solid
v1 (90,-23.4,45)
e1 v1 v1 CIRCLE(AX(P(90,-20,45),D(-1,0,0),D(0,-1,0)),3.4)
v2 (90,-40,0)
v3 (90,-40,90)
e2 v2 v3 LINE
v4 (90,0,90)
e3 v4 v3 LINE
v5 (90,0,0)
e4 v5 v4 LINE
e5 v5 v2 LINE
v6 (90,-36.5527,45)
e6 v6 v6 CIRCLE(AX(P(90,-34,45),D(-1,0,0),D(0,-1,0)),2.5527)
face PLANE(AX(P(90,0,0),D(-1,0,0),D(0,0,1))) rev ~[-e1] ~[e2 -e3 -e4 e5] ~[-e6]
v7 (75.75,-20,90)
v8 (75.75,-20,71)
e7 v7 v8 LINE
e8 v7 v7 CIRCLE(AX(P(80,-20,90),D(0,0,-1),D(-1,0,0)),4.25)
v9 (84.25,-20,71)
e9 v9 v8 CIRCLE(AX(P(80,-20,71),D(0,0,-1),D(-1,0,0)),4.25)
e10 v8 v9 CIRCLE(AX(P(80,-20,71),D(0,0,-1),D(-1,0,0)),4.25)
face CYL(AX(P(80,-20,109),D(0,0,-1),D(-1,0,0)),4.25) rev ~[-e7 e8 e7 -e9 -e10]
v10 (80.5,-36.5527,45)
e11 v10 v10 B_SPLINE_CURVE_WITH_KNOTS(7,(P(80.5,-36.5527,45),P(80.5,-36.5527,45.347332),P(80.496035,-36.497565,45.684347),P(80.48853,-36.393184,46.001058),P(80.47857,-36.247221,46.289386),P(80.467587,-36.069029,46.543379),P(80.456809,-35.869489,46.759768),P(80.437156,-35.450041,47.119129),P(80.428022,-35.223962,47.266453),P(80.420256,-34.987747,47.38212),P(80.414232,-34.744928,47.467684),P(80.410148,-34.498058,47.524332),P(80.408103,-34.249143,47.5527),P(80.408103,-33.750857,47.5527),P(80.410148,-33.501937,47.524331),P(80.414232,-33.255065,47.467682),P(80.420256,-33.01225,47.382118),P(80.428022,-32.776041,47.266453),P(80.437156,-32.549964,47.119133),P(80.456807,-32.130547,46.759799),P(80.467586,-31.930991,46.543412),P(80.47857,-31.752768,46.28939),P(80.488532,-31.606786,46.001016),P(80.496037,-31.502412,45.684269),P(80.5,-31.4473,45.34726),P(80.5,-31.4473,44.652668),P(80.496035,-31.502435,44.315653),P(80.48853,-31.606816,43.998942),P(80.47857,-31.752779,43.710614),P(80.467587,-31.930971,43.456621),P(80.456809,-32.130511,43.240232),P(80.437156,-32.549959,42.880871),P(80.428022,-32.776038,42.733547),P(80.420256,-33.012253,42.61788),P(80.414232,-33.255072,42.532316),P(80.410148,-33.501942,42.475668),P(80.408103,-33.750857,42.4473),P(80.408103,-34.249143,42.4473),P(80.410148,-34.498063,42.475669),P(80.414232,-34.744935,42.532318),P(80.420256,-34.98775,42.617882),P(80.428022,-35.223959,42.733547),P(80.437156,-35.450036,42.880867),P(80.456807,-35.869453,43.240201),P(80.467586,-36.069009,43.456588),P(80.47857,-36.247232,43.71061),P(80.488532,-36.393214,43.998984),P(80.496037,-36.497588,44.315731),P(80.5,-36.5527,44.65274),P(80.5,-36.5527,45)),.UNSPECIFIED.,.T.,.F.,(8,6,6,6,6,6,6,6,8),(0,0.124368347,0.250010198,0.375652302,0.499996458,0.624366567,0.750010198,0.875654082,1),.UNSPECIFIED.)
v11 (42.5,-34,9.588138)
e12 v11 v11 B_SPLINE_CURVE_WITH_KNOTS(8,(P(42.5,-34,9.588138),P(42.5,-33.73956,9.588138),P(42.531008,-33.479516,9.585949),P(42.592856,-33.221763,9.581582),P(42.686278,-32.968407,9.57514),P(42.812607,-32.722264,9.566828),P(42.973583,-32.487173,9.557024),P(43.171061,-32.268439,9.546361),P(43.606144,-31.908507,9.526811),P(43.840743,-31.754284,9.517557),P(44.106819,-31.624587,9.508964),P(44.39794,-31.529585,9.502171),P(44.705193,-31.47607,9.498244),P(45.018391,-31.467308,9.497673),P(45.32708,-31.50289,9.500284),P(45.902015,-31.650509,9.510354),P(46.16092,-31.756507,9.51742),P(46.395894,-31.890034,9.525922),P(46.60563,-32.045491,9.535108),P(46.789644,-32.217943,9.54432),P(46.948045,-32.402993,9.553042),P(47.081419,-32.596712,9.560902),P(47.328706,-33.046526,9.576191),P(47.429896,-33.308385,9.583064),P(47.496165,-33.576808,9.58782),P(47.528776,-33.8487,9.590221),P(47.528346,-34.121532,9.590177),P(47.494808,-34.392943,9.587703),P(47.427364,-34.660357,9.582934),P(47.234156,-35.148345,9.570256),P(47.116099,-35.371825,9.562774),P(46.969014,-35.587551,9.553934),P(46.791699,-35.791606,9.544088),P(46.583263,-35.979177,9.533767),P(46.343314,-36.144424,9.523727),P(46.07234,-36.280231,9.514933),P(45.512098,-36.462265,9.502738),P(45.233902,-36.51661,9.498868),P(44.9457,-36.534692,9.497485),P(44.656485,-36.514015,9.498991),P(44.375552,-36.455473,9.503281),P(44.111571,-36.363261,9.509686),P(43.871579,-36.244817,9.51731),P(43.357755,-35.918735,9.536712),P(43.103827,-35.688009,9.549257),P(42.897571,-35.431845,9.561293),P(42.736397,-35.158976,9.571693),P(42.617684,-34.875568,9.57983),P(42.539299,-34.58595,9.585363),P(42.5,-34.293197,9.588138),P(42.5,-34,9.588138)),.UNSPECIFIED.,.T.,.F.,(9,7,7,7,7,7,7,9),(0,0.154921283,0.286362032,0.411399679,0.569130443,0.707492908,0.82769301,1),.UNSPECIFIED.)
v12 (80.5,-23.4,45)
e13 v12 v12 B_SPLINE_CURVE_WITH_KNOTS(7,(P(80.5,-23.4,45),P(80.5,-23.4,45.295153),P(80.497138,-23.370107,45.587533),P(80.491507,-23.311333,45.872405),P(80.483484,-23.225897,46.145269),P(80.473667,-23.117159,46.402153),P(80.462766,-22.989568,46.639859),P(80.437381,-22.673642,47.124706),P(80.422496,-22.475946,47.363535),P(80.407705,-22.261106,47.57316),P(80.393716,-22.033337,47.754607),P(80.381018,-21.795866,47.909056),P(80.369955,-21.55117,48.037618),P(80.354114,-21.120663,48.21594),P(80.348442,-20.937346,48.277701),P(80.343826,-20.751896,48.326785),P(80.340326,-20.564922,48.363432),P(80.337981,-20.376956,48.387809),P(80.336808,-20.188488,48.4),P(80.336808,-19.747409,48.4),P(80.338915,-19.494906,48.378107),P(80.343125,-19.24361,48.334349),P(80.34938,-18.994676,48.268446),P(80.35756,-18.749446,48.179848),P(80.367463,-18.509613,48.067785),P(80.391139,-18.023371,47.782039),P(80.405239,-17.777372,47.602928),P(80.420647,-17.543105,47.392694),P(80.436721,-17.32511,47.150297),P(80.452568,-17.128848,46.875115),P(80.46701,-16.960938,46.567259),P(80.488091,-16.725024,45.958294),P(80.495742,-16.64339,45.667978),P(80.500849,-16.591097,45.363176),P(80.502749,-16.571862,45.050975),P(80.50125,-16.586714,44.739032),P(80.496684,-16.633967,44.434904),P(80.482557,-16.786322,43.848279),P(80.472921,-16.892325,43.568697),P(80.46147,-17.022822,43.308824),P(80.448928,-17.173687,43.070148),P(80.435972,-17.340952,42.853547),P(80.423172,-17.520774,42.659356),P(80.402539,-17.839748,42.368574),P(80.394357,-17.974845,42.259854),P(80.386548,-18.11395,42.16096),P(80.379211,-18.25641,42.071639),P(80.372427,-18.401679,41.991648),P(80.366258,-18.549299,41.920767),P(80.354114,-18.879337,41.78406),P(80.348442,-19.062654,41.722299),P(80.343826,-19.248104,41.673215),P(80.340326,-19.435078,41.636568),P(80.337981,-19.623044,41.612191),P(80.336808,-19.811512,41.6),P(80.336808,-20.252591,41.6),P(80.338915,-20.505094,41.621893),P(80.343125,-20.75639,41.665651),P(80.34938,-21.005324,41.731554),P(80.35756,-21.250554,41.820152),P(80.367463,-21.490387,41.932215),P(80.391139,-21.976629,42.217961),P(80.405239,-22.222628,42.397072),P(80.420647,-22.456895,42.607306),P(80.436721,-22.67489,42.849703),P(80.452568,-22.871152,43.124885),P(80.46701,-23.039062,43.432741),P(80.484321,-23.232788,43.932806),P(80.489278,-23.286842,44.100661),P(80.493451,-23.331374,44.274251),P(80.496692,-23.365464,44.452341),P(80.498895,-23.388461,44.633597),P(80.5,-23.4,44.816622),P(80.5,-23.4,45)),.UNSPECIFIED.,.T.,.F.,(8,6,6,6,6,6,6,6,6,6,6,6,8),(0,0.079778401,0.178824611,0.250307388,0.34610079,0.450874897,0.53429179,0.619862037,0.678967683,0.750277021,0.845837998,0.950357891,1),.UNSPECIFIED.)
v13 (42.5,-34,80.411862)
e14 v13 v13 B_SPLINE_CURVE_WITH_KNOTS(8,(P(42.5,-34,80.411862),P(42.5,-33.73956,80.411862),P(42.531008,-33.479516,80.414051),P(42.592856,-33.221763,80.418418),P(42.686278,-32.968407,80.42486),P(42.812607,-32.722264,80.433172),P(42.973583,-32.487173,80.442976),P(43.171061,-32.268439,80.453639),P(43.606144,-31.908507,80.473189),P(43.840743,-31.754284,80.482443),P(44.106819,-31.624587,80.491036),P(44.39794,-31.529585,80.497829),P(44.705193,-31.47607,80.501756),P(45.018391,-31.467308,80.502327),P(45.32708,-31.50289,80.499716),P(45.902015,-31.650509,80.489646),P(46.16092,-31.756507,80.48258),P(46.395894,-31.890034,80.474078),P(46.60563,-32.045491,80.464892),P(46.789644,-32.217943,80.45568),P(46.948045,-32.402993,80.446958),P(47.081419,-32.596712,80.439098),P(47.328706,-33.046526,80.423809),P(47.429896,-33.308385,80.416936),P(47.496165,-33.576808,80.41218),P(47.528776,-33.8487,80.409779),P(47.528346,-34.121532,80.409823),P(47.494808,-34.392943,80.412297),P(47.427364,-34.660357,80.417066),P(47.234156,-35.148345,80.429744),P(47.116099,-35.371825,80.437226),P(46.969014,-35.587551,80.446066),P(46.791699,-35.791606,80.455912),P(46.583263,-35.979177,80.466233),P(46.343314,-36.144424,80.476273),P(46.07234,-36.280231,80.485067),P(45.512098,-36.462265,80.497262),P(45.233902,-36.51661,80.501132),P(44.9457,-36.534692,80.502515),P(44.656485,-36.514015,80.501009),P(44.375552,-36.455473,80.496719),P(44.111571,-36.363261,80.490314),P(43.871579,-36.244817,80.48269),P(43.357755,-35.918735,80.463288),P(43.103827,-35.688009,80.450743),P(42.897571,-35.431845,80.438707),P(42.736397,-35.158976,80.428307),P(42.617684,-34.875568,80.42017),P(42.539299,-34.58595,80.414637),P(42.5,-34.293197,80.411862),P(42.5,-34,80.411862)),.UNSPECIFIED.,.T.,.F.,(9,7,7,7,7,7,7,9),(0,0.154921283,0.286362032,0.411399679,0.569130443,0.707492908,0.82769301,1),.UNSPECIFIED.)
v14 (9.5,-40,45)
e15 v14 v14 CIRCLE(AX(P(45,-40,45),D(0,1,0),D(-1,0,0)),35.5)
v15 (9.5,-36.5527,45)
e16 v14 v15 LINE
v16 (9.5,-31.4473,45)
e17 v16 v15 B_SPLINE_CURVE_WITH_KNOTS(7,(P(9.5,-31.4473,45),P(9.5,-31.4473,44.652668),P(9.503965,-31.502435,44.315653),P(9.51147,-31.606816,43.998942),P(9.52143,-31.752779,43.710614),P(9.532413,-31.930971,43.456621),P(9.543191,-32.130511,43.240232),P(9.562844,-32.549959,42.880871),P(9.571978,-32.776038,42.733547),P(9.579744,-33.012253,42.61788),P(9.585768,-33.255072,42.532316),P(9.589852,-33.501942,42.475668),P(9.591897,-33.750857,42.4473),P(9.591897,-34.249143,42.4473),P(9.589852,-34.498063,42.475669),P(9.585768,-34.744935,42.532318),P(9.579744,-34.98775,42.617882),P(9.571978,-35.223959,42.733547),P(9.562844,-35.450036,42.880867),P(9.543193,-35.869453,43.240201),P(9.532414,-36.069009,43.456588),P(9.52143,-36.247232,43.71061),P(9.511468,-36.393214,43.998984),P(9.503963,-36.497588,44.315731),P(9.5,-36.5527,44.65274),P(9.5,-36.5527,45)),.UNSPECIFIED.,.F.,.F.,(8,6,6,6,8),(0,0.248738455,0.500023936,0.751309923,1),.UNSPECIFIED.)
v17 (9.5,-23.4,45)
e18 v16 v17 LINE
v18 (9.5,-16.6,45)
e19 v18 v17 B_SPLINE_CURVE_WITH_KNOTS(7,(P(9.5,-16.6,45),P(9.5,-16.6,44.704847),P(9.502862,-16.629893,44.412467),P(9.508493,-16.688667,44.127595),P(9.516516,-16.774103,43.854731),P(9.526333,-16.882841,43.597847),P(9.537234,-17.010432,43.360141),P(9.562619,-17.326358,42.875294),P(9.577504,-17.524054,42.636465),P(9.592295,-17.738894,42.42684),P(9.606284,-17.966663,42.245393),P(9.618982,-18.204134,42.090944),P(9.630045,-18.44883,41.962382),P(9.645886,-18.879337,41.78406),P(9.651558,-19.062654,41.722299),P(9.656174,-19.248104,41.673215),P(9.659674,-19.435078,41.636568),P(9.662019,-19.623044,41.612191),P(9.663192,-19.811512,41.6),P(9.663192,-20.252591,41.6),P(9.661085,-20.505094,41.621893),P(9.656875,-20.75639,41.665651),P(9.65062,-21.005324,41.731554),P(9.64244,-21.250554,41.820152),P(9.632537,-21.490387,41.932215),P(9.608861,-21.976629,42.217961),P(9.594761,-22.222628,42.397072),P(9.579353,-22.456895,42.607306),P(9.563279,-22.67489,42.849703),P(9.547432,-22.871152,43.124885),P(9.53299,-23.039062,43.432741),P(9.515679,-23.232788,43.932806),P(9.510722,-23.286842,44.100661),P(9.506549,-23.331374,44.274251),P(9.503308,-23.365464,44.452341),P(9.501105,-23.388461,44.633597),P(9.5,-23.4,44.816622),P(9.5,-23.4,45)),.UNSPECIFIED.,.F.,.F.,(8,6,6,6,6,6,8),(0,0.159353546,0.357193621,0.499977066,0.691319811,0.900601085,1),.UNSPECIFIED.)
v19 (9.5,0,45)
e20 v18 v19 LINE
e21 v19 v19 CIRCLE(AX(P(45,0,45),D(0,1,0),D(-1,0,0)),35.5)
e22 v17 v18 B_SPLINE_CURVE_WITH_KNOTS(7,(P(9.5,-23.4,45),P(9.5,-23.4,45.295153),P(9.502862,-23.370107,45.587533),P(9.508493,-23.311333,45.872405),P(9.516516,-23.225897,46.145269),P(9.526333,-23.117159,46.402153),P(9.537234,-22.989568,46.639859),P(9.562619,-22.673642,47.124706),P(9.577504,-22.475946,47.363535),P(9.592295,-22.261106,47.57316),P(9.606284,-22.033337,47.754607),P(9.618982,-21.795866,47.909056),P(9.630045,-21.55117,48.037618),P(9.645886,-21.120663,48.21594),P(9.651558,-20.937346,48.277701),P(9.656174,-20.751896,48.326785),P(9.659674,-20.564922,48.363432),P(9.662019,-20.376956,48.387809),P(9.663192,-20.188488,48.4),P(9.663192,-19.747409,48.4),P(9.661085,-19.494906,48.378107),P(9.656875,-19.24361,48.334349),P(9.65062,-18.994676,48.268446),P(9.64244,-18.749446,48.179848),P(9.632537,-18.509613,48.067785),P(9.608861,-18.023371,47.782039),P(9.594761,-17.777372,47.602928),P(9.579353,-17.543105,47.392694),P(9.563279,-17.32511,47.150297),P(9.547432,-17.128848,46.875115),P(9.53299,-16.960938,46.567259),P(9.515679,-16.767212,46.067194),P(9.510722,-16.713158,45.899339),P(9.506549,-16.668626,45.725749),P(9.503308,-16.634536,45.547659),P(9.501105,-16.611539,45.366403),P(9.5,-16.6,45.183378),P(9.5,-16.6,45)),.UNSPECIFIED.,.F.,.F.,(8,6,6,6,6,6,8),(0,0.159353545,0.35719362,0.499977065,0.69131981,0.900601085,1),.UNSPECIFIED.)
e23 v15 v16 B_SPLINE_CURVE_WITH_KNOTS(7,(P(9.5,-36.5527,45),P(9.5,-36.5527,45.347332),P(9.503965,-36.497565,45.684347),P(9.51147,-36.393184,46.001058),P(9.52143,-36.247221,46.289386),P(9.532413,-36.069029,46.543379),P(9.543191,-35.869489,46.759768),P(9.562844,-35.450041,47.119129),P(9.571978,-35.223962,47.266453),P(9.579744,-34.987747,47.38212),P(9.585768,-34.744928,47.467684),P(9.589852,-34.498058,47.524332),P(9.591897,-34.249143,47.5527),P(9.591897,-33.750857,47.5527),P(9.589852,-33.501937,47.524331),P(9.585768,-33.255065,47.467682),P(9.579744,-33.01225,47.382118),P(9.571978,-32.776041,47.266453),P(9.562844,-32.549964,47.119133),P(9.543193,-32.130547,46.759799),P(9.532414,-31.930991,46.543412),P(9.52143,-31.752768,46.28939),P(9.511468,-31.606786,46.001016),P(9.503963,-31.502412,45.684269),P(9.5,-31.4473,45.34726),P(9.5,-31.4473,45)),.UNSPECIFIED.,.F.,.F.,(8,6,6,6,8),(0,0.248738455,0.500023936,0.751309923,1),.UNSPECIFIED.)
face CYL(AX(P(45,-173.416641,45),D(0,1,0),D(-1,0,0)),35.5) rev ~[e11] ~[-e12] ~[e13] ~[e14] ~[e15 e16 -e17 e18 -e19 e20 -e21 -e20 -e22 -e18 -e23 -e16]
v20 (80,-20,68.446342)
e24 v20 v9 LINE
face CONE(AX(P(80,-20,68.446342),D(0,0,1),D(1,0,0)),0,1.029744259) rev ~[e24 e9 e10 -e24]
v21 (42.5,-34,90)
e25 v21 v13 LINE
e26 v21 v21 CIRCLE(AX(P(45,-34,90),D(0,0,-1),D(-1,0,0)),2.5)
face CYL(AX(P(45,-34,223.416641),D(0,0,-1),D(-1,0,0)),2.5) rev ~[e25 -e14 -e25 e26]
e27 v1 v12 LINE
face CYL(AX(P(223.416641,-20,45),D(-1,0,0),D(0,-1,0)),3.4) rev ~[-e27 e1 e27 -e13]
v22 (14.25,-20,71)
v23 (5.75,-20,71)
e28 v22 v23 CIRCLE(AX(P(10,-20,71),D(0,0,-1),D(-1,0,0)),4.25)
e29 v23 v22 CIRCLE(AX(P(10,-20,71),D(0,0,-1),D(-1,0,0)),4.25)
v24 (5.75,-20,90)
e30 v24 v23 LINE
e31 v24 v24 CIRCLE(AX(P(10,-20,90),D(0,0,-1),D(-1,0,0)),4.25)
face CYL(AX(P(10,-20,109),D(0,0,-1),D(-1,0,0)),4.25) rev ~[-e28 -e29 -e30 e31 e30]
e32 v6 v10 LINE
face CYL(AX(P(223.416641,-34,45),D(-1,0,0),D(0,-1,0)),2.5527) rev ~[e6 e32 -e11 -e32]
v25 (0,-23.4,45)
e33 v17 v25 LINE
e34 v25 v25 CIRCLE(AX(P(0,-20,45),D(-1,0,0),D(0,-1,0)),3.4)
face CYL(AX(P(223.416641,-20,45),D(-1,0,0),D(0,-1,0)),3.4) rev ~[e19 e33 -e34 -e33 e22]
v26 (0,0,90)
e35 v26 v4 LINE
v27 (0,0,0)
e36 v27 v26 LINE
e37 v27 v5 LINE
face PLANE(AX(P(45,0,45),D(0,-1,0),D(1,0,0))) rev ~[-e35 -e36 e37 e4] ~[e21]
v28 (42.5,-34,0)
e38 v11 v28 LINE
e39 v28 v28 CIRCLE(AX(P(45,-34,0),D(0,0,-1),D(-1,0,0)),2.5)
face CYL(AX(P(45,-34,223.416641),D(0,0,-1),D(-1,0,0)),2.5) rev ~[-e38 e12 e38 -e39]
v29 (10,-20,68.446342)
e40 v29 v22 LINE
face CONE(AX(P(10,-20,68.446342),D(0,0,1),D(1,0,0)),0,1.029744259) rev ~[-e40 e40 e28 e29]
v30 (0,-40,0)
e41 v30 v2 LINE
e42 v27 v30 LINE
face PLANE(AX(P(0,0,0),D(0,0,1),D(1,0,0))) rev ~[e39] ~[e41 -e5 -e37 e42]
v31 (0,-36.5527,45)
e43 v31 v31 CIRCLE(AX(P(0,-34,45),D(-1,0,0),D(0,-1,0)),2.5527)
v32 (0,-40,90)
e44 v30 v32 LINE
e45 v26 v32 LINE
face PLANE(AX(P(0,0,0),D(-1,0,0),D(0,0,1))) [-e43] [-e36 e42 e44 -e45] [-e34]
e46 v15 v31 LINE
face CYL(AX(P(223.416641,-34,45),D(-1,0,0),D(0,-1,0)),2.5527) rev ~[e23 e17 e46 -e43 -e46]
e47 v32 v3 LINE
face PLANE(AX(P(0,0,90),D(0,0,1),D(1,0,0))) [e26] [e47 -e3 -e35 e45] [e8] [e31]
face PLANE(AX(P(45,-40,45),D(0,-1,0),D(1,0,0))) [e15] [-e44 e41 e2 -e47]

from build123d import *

# Parameters (mm, degrees)
F0_W      = 90
F0_H      = 90
F1_DEPTH  = 40
F3_D      = 71
F5_D      = 5.1054
F6_D      = 6.8
F8_D      = 5
F10_D     = 8.5
F10_DEPTH = 19
F10_TIP   = 2.5536576309


# Not quite as in the source:
# - a feature names something its author has since deleted; it is built from what else it names


with BuildPart() as f1:
    # F0 (on Front) → F1 (new body)
    with BuildSketch(Plane.XZ):
        with Locations((45, 45)):
            Rectangle(F0_W, F0_H)
    extrude(amount=F1_DEPTH)

    # F3 (through all)
    with Locations(Plane.XZ.offset(40)):
        with Locations((45, 45)):
            Hole(F3_D / 2)

    # F5 (through all)
    with Locations(Plane.YZ.offset(90)):
        with Locations((-34, 45)):
            Hole(F5_D / 2)

    # F6 (through all)
    with Locations(Plane.YZ.offset(90)):
        with Locations((-20, 45)):
            Hole(F6_D / 2)

    # F8 (through all)
    with Locations(Plane.XY.offset(90)):
        with Locations((45, -34)):
            Hole(F8_D / 2)

    # F10
    with Locations(Plane.XY.offset(90)):
        with Locations((10, -20), (80, -20)):
            Hole(F10_D / 2, depth=F10_DEPTH)
            with Locations((0, 0, -(F10_DEPTH + F10_TIP / 2))):  # 118° drill point
                Cone(0, F10_D / 2, F10_TIP, mode=Mode.SUBTRACT)


solid = f1.part
